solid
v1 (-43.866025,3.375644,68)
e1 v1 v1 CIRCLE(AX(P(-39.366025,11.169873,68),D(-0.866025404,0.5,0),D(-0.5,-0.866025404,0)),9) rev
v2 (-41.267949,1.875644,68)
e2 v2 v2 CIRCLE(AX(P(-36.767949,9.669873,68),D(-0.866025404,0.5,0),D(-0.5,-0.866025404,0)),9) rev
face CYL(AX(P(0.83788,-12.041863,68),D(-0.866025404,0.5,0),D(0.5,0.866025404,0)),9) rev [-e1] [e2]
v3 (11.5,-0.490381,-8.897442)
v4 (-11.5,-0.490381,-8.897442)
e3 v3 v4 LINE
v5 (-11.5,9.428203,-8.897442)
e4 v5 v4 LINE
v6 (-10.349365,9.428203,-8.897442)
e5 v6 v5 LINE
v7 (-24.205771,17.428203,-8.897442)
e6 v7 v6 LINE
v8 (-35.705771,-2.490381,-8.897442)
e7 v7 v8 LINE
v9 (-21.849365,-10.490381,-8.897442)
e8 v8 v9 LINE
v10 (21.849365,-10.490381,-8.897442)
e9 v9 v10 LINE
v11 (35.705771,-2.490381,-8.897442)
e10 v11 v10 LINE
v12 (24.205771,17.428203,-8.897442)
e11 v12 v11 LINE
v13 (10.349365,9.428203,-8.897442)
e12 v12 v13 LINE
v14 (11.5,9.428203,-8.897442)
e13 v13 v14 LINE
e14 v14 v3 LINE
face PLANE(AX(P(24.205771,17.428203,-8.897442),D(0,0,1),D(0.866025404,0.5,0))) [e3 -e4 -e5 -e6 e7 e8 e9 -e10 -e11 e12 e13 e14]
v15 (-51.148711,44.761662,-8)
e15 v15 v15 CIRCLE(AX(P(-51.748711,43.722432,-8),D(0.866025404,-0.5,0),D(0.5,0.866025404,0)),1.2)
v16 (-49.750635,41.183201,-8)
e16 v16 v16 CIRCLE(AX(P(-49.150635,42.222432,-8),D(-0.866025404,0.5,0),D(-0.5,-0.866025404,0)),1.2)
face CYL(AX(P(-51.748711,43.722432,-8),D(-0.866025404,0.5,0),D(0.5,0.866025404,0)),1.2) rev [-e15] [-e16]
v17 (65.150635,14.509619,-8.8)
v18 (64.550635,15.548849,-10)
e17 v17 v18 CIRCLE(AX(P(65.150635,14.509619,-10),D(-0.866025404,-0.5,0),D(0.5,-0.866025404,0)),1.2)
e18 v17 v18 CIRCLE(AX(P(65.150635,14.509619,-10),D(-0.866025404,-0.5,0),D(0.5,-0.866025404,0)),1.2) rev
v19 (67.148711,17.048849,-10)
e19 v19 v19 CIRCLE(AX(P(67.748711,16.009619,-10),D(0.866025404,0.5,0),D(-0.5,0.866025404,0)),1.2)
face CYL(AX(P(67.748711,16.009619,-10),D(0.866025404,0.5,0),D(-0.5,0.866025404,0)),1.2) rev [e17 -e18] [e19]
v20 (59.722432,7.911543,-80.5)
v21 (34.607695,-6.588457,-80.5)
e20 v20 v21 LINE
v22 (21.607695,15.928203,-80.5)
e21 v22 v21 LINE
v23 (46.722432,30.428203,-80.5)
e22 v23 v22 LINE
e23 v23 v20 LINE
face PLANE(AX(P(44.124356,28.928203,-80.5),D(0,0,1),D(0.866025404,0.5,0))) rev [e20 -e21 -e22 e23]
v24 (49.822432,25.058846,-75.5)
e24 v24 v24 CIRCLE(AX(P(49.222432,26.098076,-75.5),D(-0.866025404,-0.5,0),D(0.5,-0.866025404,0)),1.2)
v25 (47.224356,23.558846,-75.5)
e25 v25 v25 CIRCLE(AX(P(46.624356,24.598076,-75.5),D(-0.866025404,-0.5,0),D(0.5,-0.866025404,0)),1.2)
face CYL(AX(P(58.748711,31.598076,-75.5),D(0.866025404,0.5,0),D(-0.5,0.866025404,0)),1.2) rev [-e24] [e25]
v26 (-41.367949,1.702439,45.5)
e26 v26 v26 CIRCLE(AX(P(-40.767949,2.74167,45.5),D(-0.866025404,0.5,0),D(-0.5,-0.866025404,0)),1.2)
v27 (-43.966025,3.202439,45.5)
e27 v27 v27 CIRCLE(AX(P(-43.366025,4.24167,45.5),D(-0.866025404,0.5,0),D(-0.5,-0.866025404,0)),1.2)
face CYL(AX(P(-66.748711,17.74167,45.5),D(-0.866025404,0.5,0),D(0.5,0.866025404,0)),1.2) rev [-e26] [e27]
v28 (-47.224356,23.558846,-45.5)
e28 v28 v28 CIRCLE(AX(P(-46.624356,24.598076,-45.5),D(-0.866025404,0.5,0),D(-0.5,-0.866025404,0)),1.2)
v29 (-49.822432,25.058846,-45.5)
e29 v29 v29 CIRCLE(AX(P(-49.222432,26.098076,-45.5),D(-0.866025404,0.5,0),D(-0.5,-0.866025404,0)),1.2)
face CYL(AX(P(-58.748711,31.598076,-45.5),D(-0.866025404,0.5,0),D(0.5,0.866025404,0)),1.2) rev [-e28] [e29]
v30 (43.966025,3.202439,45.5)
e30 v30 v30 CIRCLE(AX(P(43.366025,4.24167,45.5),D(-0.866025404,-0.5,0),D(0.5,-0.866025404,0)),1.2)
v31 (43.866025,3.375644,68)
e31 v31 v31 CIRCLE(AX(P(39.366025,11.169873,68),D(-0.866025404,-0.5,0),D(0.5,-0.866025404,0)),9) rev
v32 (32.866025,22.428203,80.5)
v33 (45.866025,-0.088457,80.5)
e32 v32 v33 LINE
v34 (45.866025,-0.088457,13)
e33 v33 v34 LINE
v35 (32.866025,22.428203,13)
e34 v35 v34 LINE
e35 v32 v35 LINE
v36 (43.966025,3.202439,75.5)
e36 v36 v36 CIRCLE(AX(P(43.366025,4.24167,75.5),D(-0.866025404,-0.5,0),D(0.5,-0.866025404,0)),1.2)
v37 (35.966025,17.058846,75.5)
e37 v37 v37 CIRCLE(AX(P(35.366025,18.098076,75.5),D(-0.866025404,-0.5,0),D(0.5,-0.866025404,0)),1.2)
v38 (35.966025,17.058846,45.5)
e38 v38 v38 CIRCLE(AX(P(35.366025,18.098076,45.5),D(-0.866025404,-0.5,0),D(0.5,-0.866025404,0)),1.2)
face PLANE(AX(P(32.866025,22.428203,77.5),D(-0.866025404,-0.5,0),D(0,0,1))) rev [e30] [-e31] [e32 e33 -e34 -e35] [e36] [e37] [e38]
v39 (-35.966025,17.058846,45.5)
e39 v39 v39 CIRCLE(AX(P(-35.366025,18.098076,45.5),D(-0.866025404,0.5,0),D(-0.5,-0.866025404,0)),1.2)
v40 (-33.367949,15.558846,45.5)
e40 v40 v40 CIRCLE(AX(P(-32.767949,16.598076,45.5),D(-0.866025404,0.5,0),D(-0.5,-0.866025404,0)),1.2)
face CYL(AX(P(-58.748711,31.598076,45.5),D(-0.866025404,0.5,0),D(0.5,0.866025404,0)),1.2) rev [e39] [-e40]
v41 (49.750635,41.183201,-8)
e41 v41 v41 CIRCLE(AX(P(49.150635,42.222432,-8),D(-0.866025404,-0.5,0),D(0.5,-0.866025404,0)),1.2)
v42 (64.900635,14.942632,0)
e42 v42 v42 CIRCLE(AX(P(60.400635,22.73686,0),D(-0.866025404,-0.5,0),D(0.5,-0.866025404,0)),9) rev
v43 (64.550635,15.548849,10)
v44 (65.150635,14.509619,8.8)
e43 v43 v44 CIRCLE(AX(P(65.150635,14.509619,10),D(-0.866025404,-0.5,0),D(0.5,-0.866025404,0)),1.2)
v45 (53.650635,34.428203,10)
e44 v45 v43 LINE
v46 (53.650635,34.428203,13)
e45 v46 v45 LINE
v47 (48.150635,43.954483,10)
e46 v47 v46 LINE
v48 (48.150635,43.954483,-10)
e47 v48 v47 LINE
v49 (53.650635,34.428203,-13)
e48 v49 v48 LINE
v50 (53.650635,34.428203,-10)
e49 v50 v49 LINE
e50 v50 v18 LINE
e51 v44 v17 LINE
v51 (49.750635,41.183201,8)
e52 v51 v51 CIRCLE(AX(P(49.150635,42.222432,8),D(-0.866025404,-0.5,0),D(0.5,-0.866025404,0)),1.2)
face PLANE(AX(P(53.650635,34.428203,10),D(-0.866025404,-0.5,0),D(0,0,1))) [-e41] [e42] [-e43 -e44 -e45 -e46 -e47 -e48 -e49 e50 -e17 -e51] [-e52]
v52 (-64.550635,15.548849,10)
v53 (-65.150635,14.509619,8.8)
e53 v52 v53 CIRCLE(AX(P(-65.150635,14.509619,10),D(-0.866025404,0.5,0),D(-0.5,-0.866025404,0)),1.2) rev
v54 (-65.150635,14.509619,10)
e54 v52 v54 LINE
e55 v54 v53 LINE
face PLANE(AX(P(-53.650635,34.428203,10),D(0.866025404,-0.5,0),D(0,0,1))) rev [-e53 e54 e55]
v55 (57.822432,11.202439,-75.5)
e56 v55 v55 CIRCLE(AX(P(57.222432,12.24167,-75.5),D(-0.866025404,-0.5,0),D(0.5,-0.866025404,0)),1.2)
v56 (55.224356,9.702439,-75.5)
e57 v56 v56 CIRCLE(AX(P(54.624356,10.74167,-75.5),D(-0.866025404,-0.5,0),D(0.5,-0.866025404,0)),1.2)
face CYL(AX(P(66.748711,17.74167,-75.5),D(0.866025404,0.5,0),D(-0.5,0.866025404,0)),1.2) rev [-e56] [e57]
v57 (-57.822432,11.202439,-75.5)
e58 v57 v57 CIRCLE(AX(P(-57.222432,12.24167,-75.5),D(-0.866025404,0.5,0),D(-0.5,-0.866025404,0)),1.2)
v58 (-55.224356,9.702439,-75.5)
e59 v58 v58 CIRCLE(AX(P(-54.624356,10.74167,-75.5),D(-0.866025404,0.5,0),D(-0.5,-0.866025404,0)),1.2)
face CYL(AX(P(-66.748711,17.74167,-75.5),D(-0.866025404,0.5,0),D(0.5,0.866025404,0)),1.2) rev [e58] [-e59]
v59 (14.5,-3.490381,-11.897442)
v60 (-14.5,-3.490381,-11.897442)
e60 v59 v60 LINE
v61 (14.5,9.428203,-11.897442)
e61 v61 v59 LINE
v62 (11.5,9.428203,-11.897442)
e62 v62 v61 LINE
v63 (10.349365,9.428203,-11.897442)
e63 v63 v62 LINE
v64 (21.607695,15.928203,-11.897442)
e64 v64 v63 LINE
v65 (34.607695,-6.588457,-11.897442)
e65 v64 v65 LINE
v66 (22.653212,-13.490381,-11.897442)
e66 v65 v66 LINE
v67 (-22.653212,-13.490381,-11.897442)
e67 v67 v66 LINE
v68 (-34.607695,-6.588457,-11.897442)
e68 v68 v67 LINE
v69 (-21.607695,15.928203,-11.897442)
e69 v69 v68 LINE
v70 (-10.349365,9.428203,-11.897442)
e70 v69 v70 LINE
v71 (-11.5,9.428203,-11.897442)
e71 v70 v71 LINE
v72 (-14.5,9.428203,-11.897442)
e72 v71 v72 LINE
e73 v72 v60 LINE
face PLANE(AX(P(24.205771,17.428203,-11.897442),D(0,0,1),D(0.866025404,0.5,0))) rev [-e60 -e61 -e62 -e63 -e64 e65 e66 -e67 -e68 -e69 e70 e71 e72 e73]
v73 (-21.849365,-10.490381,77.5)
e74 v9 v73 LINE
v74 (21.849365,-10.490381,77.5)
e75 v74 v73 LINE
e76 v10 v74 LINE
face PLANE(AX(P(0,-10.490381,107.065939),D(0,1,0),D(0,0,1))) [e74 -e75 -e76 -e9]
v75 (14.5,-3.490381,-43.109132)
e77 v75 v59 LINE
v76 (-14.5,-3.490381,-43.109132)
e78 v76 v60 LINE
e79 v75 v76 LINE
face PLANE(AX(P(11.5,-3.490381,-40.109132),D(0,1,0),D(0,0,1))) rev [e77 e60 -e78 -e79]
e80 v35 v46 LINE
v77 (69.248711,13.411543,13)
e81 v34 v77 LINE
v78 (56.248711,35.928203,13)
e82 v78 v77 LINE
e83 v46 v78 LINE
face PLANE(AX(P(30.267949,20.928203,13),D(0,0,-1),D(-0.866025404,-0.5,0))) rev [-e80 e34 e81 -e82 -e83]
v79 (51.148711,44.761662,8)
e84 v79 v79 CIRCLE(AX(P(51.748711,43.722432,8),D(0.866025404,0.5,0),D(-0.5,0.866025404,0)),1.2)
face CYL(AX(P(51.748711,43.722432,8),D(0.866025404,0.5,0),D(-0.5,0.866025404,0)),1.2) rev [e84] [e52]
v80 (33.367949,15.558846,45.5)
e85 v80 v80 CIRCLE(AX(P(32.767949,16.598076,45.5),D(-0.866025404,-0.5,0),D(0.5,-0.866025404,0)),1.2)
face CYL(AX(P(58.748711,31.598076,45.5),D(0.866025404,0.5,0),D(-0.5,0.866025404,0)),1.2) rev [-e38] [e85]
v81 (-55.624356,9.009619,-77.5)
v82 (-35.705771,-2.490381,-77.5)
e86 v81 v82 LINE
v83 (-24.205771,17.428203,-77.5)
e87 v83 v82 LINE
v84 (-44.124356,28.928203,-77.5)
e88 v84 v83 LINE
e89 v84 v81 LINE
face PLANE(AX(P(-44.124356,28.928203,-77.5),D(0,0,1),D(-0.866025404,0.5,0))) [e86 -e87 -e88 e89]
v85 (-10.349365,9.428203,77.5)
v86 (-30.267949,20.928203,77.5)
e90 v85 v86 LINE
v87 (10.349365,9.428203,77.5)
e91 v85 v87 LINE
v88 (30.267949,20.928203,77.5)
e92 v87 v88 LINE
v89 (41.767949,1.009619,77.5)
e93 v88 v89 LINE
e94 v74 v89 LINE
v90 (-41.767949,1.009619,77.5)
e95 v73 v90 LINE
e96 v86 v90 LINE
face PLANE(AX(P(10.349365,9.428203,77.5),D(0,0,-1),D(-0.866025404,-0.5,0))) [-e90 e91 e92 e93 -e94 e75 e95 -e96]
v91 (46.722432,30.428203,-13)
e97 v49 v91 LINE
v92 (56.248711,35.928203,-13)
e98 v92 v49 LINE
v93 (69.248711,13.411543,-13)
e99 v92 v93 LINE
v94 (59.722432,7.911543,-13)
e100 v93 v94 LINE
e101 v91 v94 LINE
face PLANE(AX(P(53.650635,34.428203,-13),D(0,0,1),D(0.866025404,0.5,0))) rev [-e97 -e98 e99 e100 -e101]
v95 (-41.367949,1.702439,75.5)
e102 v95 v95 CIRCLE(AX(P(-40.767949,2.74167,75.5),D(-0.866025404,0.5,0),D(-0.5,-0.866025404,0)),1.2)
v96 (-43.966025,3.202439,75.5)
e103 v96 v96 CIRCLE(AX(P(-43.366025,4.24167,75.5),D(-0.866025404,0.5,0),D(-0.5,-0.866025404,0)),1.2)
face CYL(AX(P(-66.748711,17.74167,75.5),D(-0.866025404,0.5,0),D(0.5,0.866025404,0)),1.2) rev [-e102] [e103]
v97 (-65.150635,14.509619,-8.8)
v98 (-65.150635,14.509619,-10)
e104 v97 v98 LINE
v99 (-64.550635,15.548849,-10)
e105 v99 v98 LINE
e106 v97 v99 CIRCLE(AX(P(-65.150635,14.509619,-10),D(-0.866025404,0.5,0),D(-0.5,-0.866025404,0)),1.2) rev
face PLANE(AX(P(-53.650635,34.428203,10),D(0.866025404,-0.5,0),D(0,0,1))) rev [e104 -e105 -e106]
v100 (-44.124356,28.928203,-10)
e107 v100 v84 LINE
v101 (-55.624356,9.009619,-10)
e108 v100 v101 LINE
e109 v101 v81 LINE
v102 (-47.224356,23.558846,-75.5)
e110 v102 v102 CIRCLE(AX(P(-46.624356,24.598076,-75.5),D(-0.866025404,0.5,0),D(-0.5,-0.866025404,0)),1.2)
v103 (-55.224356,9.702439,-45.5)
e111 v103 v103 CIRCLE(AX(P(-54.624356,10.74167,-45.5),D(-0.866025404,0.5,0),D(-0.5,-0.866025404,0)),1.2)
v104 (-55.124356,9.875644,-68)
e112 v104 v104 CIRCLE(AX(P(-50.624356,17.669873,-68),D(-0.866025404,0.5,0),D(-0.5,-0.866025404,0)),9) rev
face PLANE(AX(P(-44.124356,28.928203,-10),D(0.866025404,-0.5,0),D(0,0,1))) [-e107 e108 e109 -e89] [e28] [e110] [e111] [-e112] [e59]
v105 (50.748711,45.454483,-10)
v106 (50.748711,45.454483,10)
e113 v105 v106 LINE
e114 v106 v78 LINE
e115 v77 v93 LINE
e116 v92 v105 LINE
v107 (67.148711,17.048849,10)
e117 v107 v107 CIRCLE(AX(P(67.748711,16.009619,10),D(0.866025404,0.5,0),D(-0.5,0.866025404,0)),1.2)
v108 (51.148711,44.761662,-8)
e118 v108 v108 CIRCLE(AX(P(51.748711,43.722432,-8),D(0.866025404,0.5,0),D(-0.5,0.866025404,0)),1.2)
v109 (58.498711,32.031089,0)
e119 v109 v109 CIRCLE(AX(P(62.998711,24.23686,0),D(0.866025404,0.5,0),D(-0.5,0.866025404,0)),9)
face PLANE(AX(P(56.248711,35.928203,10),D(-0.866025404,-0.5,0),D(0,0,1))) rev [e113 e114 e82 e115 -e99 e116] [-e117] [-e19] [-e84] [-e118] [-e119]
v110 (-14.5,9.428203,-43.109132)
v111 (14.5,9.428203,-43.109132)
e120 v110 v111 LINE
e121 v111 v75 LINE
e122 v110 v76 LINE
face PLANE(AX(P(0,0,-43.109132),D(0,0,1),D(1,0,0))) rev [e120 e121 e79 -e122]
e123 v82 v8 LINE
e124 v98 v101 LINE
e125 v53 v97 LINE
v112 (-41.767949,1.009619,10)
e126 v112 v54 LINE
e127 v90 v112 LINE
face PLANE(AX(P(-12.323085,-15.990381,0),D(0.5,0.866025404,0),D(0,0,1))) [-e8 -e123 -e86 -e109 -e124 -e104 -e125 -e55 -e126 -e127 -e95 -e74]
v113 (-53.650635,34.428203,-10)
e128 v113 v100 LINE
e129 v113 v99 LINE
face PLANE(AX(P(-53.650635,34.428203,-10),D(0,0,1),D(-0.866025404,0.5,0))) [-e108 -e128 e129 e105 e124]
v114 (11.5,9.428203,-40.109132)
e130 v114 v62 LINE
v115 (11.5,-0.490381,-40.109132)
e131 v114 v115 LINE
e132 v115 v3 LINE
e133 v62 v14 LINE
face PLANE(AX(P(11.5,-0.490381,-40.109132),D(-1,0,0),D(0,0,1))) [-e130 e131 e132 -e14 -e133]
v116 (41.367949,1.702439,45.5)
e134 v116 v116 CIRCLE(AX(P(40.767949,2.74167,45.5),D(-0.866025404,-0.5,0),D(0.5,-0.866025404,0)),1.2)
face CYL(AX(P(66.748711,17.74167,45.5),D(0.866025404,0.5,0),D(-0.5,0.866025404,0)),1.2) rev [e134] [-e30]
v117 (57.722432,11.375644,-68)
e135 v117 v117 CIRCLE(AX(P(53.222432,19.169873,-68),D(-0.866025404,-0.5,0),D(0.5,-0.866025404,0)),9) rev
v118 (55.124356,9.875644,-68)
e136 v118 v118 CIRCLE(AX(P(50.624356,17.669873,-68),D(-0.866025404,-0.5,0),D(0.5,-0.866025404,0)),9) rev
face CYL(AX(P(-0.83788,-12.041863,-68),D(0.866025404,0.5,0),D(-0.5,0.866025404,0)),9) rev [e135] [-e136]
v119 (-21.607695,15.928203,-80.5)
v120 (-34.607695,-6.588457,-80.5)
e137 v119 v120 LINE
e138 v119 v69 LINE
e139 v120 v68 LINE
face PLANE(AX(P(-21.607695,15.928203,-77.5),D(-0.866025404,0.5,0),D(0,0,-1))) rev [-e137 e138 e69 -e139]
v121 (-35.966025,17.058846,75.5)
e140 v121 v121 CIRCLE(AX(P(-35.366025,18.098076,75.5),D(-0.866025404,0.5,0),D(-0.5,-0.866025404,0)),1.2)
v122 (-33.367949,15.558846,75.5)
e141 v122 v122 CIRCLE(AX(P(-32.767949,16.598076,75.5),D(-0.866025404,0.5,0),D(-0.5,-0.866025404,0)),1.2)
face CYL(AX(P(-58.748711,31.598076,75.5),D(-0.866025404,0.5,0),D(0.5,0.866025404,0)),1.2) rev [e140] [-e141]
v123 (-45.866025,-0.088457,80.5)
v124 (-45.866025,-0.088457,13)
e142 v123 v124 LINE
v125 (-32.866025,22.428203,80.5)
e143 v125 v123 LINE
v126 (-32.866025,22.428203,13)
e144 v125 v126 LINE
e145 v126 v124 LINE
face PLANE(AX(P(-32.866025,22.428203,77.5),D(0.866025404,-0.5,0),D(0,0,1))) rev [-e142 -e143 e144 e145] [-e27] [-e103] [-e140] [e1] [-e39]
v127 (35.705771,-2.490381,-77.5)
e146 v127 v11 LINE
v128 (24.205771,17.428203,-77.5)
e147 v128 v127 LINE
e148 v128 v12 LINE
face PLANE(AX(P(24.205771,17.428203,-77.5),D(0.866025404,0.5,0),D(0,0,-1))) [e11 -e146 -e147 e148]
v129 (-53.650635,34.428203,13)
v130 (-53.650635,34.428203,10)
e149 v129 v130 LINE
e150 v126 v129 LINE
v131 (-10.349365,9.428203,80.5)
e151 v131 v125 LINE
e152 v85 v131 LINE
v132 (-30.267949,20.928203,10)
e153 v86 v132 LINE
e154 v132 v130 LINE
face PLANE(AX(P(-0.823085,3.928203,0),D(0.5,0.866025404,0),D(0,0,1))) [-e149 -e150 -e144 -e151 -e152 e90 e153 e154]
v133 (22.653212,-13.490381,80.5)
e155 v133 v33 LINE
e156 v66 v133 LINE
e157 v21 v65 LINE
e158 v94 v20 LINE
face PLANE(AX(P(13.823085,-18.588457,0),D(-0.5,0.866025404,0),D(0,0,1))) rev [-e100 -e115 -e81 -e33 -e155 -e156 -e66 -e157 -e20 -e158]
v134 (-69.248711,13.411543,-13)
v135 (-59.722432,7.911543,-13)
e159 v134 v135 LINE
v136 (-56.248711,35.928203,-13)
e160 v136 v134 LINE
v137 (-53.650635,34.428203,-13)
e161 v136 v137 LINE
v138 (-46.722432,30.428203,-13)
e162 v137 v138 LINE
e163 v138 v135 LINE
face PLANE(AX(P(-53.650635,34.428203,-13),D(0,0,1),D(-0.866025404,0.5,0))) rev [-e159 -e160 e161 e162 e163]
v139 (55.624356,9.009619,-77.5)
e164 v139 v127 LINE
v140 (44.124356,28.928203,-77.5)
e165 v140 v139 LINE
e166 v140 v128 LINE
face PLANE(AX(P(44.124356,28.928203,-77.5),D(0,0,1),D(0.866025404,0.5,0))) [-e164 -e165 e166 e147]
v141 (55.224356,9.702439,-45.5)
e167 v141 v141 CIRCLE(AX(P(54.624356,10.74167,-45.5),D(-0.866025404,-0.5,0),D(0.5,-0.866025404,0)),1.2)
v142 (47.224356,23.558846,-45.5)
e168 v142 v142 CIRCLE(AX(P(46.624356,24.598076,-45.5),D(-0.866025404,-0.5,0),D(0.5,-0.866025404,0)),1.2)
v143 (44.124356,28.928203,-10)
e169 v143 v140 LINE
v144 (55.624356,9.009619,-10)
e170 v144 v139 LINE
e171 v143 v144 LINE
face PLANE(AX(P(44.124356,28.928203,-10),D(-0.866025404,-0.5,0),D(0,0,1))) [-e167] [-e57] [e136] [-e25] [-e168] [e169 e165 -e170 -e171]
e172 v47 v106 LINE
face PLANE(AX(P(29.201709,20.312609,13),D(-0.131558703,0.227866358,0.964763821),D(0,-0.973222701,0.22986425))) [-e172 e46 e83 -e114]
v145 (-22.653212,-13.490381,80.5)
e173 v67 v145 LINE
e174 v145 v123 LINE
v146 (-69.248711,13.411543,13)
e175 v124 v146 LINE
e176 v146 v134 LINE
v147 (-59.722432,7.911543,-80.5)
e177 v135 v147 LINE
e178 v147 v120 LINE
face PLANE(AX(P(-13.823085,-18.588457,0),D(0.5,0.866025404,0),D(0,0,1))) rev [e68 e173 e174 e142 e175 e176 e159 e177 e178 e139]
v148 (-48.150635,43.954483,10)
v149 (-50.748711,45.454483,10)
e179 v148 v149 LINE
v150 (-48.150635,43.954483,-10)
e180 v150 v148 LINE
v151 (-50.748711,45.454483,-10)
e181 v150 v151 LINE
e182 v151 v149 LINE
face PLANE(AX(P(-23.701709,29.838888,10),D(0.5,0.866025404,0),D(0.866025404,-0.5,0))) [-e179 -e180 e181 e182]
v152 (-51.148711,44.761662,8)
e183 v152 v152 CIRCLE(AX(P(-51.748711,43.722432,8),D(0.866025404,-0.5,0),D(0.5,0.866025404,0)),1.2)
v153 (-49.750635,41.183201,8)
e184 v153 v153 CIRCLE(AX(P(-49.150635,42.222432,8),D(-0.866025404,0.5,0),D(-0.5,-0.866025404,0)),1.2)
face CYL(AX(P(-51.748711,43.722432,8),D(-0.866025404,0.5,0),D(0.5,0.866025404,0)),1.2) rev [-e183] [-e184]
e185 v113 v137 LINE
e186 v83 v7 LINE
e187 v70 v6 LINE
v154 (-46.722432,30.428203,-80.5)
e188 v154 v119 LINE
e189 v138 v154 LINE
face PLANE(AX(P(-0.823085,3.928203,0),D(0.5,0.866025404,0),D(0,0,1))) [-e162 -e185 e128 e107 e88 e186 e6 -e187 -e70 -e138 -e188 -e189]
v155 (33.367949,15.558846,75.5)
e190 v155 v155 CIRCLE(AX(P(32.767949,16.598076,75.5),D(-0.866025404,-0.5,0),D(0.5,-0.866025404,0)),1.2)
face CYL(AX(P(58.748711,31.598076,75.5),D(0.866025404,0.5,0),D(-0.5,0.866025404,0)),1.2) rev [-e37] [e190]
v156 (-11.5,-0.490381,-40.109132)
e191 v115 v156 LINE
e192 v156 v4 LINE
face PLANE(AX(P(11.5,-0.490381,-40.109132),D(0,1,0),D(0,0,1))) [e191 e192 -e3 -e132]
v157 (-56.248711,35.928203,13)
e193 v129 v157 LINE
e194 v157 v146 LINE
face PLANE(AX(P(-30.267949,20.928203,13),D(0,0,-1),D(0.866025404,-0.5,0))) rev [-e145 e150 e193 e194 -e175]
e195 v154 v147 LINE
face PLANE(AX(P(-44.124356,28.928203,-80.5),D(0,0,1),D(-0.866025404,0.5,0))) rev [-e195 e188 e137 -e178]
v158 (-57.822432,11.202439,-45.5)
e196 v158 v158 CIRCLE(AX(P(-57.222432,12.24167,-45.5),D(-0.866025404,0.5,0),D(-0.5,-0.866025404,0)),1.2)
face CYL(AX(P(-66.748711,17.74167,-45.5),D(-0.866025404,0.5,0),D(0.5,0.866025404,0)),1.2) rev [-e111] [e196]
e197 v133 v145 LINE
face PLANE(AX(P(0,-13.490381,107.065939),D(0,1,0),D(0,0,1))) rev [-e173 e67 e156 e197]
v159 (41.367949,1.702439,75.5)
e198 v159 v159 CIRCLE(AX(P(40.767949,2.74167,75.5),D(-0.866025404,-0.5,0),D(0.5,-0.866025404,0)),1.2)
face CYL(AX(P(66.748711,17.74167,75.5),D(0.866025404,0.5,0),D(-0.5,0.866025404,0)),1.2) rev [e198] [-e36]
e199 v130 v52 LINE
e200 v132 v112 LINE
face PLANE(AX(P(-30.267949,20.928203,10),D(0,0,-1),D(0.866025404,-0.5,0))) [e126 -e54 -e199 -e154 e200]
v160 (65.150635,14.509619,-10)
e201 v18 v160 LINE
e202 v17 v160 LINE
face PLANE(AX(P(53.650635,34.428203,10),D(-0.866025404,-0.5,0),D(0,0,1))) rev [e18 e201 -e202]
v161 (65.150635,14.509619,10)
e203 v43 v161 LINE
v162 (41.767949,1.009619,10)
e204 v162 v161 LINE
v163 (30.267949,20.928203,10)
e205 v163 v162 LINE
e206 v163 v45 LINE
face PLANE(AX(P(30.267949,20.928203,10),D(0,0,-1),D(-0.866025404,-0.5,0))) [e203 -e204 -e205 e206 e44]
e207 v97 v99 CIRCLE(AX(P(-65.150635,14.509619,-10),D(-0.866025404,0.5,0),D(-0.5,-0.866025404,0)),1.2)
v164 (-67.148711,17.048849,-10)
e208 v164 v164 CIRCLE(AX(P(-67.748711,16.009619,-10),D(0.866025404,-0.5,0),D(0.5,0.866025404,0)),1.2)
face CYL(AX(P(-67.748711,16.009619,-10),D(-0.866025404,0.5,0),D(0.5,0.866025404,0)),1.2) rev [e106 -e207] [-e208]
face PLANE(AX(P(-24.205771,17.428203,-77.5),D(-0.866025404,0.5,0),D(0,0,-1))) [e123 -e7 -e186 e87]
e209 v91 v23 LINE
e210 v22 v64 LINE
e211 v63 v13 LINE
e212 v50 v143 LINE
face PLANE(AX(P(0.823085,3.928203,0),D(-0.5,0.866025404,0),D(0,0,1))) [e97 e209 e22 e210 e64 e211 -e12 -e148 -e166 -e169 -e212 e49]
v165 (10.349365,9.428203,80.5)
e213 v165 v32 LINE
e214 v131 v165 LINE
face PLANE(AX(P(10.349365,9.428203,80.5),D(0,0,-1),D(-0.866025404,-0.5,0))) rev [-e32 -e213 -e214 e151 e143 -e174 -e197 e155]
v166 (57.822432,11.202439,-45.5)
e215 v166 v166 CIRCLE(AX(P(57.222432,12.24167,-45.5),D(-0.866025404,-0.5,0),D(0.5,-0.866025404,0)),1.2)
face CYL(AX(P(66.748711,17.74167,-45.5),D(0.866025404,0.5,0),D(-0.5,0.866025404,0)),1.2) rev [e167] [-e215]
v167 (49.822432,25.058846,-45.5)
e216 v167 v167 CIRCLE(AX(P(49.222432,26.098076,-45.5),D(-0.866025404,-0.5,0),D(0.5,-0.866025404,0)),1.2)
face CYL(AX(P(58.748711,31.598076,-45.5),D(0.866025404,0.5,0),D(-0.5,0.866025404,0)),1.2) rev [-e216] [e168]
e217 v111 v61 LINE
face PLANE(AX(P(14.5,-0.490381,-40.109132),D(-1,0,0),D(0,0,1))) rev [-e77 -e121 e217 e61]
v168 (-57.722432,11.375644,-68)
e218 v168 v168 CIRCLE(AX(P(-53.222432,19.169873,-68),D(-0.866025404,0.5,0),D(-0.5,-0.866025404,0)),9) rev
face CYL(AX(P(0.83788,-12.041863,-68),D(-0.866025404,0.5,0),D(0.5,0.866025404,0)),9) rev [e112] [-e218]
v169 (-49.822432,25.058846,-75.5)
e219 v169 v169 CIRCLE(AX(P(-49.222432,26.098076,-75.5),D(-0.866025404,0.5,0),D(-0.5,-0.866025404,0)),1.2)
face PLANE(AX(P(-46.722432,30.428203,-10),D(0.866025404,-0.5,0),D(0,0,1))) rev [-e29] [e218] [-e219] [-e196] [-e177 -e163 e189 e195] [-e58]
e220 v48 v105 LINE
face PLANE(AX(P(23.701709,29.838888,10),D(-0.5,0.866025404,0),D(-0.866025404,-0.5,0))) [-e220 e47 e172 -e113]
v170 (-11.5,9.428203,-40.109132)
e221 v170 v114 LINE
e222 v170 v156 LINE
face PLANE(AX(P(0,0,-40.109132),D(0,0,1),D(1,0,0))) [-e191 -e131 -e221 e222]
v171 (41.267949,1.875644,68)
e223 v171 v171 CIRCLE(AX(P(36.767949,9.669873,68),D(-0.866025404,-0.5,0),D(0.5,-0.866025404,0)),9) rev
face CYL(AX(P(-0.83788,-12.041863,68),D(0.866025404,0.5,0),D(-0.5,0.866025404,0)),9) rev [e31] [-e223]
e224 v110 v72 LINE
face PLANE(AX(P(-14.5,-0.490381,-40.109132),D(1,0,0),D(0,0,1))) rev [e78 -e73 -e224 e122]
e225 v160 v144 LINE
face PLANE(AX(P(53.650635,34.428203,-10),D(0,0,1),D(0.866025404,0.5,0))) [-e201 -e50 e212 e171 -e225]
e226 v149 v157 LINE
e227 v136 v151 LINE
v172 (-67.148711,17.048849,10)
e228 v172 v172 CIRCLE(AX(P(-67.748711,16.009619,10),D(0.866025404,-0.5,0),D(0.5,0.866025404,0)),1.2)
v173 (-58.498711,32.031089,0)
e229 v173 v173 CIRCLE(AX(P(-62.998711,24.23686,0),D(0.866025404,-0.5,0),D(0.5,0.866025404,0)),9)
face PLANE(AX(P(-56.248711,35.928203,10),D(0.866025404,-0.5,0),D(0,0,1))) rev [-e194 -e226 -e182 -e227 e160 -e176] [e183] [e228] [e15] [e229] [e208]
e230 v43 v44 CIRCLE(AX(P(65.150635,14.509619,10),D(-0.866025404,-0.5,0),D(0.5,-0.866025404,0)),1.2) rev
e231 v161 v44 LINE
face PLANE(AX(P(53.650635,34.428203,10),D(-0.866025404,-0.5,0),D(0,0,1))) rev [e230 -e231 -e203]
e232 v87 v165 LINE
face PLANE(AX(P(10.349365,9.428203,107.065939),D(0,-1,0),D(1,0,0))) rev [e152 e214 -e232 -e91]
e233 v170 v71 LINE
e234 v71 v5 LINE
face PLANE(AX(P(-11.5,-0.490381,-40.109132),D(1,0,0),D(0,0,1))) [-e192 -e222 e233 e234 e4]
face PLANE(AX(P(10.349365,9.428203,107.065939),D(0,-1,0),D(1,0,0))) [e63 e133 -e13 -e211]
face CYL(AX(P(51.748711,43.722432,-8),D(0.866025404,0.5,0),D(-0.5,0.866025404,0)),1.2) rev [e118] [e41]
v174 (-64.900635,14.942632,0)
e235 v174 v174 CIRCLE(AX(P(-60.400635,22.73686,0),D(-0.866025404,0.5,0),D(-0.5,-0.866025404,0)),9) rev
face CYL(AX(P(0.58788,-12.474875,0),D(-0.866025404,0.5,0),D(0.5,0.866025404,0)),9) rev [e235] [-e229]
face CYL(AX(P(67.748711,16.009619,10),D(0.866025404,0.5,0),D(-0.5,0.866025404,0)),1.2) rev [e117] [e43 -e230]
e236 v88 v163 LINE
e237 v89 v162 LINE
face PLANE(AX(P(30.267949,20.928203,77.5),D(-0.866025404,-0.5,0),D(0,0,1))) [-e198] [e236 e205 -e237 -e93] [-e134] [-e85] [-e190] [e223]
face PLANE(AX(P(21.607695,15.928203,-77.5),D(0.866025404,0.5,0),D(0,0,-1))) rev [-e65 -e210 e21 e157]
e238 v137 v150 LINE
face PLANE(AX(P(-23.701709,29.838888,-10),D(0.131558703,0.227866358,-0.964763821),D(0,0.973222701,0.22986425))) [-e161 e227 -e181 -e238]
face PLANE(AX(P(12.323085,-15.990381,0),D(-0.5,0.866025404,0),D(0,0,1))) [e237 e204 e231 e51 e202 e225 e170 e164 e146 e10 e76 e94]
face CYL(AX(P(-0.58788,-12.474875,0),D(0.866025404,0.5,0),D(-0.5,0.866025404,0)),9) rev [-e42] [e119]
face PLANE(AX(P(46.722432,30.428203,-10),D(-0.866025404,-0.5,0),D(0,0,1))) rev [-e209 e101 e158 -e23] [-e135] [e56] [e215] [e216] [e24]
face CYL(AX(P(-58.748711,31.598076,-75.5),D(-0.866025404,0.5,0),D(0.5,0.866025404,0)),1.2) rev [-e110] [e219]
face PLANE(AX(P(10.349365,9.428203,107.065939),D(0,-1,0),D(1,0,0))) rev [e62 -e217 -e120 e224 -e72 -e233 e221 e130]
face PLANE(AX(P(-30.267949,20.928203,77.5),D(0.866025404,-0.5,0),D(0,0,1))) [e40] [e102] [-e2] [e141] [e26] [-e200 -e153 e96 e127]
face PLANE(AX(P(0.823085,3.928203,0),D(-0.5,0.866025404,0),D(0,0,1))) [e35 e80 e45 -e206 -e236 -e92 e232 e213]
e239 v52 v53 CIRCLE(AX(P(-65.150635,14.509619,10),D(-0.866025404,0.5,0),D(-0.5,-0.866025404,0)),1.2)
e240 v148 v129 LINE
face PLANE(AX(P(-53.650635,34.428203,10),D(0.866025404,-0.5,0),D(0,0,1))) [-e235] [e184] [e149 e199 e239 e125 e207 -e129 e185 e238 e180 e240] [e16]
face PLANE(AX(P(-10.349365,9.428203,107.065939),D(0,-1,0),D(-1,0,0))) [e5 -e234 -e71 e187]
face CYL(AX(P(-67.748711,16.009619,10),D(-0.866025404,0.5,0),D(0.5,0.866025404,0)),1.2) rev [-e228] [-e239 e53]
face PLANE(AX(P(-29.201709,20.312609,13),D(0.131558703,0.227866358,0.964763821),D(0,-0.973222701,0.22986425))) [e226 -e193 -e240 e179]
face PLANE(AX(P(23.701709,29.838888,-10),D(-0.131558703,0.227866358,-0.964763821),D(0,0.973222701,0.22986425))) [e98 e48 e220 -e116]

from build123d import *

# Parameters (mm, degrees)
BOSS_EXTRUDE1_DEPTH            = 23
BODY_MOVE_COPY1_ANGLE          = 30
BOSS_EXTRUDE2_DEPTH            = 77.5
BOSS_EXTRUDE2_DEPTH_BACK       = 8.89744
SKETCH13_W                     = 11.5
SKETCH13_H                     = 9.918584287
BOSS_EXTRUDE4_DEPTH            = 31.21169
SHELL1_START                   = 11.5
SHELL1_DEPTH                   = 3
SHELL1_2_DEPTH                 = 22.653212483
SHELL1_3_DEPTH                 = 11.5
SHELL1_4_DEPTH                 = 22.653212483
SHELL1_5_DEPTH                 = 11.5
SHELL1_6_DEPTH                 = 11.153212483
SHELL1_START_2                 = -77.5
SHELL1_7_DEPTH                 = 87.5
SHELL1_START_3                 = -8.897442479
SHELL1_8_DEPTH                 = 86.397442477
SHELL1_START_4                 = -10
SHELL1_9_DEPTH                 = 20
SHELL1_START_5                 = -80.5
SHELL1_10_DEPTH                = 70.5
SHELL1_START_6                 = 10
SHELL1_11_DEPTH                = 70.499999998
SHELL1_START_7                 = -11.897442479
SHELL1_12_DEPTH                = 24.897442479
SHELL1_13_DEPTH                = 3
SHELL1_14_DEPTH                = 3
SHELL1_START_8                 = 77.499999998
SHELL1_15_DEPTH                = 3
SHELL1_16_DEPTH                = 1.897442479
SHELL1_START_9                 = -13
SHELL1_17_DEPTH                = 1.102557521
SHELL1_START_10                = -10.287226583
SHELL1_18_DEPTH                = 1.389784104
CUT_EXTRUDE2_REACH             = 111.579
SKETCH6_R                      = 9
BOSS_EXTRUDE3_DEPTH            = 3
M2_START                       = 36
M2_CLEARANCE_HOLE1_OUTLINE_R   = 1.2
M2_CLEARANCE_HOLE1_DEPTH       = 30.676914536
M2_START_2                     = 63.676914536
M2_CLEARANCE_HOLE1_2_OUTLINE_R = 1.2
M2_CLEARANCE_HOLE1_2_DEPTH     = 3


with BuildPart() as part:
    # Sketch2 → Boss-Extrude1 (new body)
    with BuildSketch(Plane(origin=(0, 0, 0), x_dir=(1, 0, 0), z_dir=(0, 1, 0))):
        Polygon((11, -77.499999998), (34, -77.499999998), (34, -10), (61, -10), (61, 10), (50, 10), (50, 77.5), (27, 77.5), (27, 8.897442479), (11, 8.897442479), align=None)
    extrude(amount=BOSS_EXTRUDE1_DEPTH)


with BuildPart() as part_1:
    # Body-Move/Copy1: moved
    add(part.part.rotate(Axis((36, 15, 0), (0, 0, 1)), BODY_MOVE_COPY1_ANGLE))

    # Sketch7 → Boss-Extrude2 (add, two sides: drawn at the far end of the back side and taken through both)
    with BuildSketch(Plane.XY.offset(-BOSS_EXTRUDE2_DEPTH_BACK)):
        Polygon((10.349364905, 9.42820323), (0, 9.42820323), (0, -10.490381057), (21.849364905, -10.490381057), align=None)
    extrude(amount=BOSS_EXTRUDE2_DEPTH + BOSS_EXTRUDE2_DEPTH_BACK)


with BuildPart() as boss_extrude4_tool:
    # Sketch13 → Boss-Extrude4 (new body)
    with BuildSketch(Plane(origin=(0, 0, -8.897442479), x_dir=(-1, 0, 0), z_dir=(0, 0, -1))):
        with Locations((-5.75, 4.468911087)):
            Rectangle(SKETCH13_W, SKETCH13_H)
    extrude(amount=BOSS_EXTRUDE4_DEPTH)


with BuildPart() as part_2:
    add(part_1.part)


with BuildPart() as part_3:
    # Boss-Extrude4: joined with boss_extrude4_tool
    add(part_2.part.fuse(boss_extrude4_tool.part, tol=0.00001))

    # Shell1: read off the stored shape, not the designer's step
    # Shell1 outline → Shell1 (add)
    with BuildSketch(Plane.YZ.offset(SHELL1_START)):
        Polygon((9.42820323, -13), (9.42820323, -11.897442479), (-3.490381057, -11.897442479), (-3.490381057, -43.109132218), (9.42820323, -43.109132218), align=None)
    extrude(amount=SHELL1_DEPTH)

    # Shell1 2 outline → Shell1 2 (cut)
    with BuildSketch(Plane.YZ):
        Polygon((9.42820323, 13), (9.42820323, 77.499999998), (-10.490381057, 77.499999998), (-10.490381057, -8.897442479), (9.42820323, -8.897442479), (9.42820323, 10), align=None)
    extrude(amount=SHELL1_2_DEPTH, mode=Mode.SUBTRACT)

    # Shell1 3 outline → Shell1 3 (cut)
    with BuildSketch(Plane.YZ):
        Polygon((9.42820323, -10), (9.42820323, -8.897442479), (-0.490381057, -8.897442479), (-0.490381057, -40.109132218), (9.42820323, -40.109132218), (9.42820323, -13), align=None)
    extrude(amount=SHELL1_3_DEPTH, mode=Mode.SUBTRACT)

    # Shell1 4 outline → Shell1 4 (add)
    with BuildSketch(Plane.YZ):
        Polygon((9.42820323, 77.499999998), (9.42820323, 80.499999998), (-13.490381057, 80.499999998), (-13.490381057, -11.897442479), (-0.490381057, -11.897442479), (-0.490381057, -8.897442479), (-10.490381057, -8.897442479), (-10.490381057, 77.499999998), align=None)
    extrude(amount=SHELL1_4_DEPTH)

    # Shell1 5 outline → Shell1 5 (add)
    with BuildSketch(Plane.YZ):
        Polygon((-0.490381057, -11.897442479), (-3.490381057, -11.897442479), (-3.490381057, -43.109132218), (9.42820323, -43.109132218), (9.42820323, -40.109132218), (-0.490381057, -40.109132218), align=None)
    extrude(amount=SHELL1_5_DEPTH)

    # Shell1 6 outline → Shell1 6 (add)
    with BuildSketch(Plane.YZ.offset(SHELL1_START)):
        Polygon((9.42820323, -10), (9.42820323, -8.897442479), (-0.490381057, -8.897442479), (-0.490381057, -11.897442479), (9.42820323, -11.897442479), align=None)
    extrude(amount=SHELL1_6_DEPTH)

    # Shell1 7 outline → Shell1 7 (cut)
    with BuildSketch(Plane.XY.offset(SHELL1_START_2)):
        Polygon((44.124355653, 28.92820323), (24.205771366, 17.42820323), (35.705771366, -2.490381057), (55.624355653, 9.009618943), align=None)
    extrude(amount=SHELL1_7_DEPTH, mode=Mode.SUBTRACT)

    # Shell1 8 outline → Shell1 8 (cut)
    with BuildSketch(Plane.XY.offset(SHELL1_START_3)):
        Polygon((41.767949192, 1.009618943), (30.267949192, 20.92820323), (10.349364905, 9.42820323), (22.653212483, 9.42820323), (22.653212483, -10.026279441), align=None)
    extrude(amount=SHELL1_8_DEPTH, mode=Mode.SUBTRACT)

    # Shell1 9 outline → Shell1 9 (cut)
    with BuildSketch(Plane.XY.offset(SHELL1_START_4)):
        Polygon((44.124355653, 28.92820323), (55.624355653, 9.009618943), (65.150635095, 14.509618943), (53.650635095, 34.42820323), align=None)
    extrude(amount=SHELL1_9_DEPTH, mode=Mode.SUBTRACT)

    # Shell1 11 outline → Shell1 11 (add)
    with BuildSketch(Plane.XY.offset(SHELL1_START_6)):
        Polygon((32.866025404, 22.42820323), (30.267949192, 20.92820323), (41.767949192, 1.009618943), (21.849364905, -10.490381057), (22.653212483, -10.490381057), (22.653212483, -13.490381057), (45.866025404, -0.088457268), align=None)
    extrude(amount=SHELL1_11_DEPTH)



with BuildPart() as body_2:
    # Shell1 10 outline → Shell1 10 (new body)
    with BuildSketch(Plane.XY.offset(SHELL1_START_5)):
        Polygon((55.624355653, 9.009618943), (35.705771366, -2.490381057), (24.205771366, 17.42820323), (21.607695155, 15.92820323), (34.607695155, -6.588457268), (59.722431864, 7.911542732), (46.722431864, 30.42820323), (44.124355653, 28.92820323), align=None)
    extrude(amount=SHELL1_10_DEPTH)


with BuildPart() as part_4:
    add(part_3.part)

    add(body_2.part)  # Shell1 12 merges body 2
    # Shell1 12 outline → Shell1 12 (add)
    with BuildSketch(Plane.XY.offset(SHELL1_START_7)):
        Polygon((21.849364905, -10.490381057), (22.653212483, -10.490381057), (22.653212483, -13.490381057), (69.248711306, 13.411542732), (56.248711306, 35.92820323), (53.650635095, 34.42820323), (65.150635095, 14.509618943), align=None)
    extrude(amount=SHELL1_12_DEPTH)

    # Shell1 13 outline → Shell1 13 (add)
    with BuildSketch(Plane.XY.offset(SHELL1_START_6)):
        Polygon((32.866025404, 22.42820323), (44.366025404, 2.509618943), (65.150635095, 14.509618943), (53.650635095, 34.42820323), align=None)
    extrude(amount=SHELL1_13_DEPTH)

    # Shell1 14 outline → Shell1 14 (add)
    with BuildSketch(Plane.XY.offset(SHELL1_START_5)):
        Polygon((44.124355653, 28.92820323), (24.205771366, 17.42820323), (35.705771366, -2.490381057), (55.624355653, 9.009618943), align=None)
    extrude(amount=SHELL1_14_DEPTH)

    # Shell1 15 outline → Shell1 15 (add)
    with BuildSketch(Plane.XY.offset(SHELL1_START_8)):
        Polygon((41.767949192, 1.009618943), (30.267949192, 20.92820323), (10.349364905, 9.42820323), (22.653212483, 9.42820323), (22.653212483, -10.026279441), align=None)
    extrude(amount=SHELL1_15_DEPTH)

    # Shell1 16 outline → Shell1 16 (add)
    with BuildSketch(Plane.XY.offset(SHELL1_START_7)):
        Polygon((53.650635095, 34.42820323), (46.722431864, 30.42820323), (58.222431864, 10.509618943), (65.150635095, 14.509618943), align=None)
        Polygon((33.107695155, -3.990381057), (21.607695155, 15.92820323), (10.349364905, 9.42820323), (22.653212483, 9.42820323), (22.653212483, -10.026279441), align=None)
    extrude(amount=SHELL1_16_DEPTH)

    # Shell1 17 outline → Shell1 17 (add)
    with BuildSketch(Plane.XY.offset(SHELL1_START_9)):
        Polygon((46.722431864, 30.42820323), (59.722431864, 7.911542732), (69.248711306, 13.411542732), (56.248711306, 35.92820323), align=None)
    extrude(amount=SHELL1_17_DEPTH)

    # Shell1 18 outline → Shell1 18 (add)
    with BuildSketch(Plane.XY.offset(SHELL1_START_10)):
        Polygon((35.705771366, -2.490381057), (24.205771366, 17.42820323), (10.349364905, 9.42820323), (22.653212483, 9.42820323), (22.653212483, -10.026279441), align=None)
    extrude(amount=SHELL1_18_DEPTH)

    # Sketch6 → Cut-Extrude2 (cut, up to next)
    with BuildSketch(Plane(origin=(57.743901834, 33.338457268, 0), x_dir=(0, 0, -1), z_dir=(0.8660254037842566, 0.5000000000003155, 0)), mode=Mode.PRIVATE) as cut_extrude2_sk1:
        with Locations(Location((-67.999999998, -10.009618943, 0), (0, 0, 270))):
            Circle(SKETCH6_R)
    cut_extrude2_tool1 = extrude(cut_extrude2_sk1.sketch, amount=-CUT_EXTRUDE2_REACH, mode=Mode.PRIVATE) & part_4.part
    # Sketch6 → Cut-Extrude2 (cut, up to next)
    with BuildSketch(Plane(origin=(57.743901834, 33.338457268, 0), x_dir=(0, 0, -1), z_dir=(0.8660254037842566, 0.5000000000003155, 0)), mode=Mode.PRIVATE) as cut_extrude2_sk2:
        with Locations(Location((0, -10.509618943, 0), (0, 0, 90))):
            Circle(SKETCH6_R)
    cut_extrude2_tool2 = extrude(cut_extrude2_sk2.sketch, amount=-CUT_EXTRUDE2_REACH, mode=Mode.PRIVATE) & part_4.part
    # Sketch6 → Cut-Extrude2 (cut, up to next)
    with BuildSketch(Plane(origin=(57.743901834, 33.338457268, 0), x_dir=(0, 0, -1), z_dir=(0.8660254037842566, 0.5000000000003155, 0)), mode=Mode.PRIVATE) as cut_extrude2_sk3:
        with Locations(Location((68, -10.009618943, 0), (0, 0, 270))):
            Circle(SKETCH6_R)
    cut_extrude2_tool3 = extrude(cut_extrude2_sk3.sketch, amount=-CUT_EXTRUDE2_REACH, mode=Mode.PRIVATE) & part_4.part
    add(cut_extrude2_tool1.solids().sort_by_distance((62.748711, 24.669873, 68))[0], mode=Mode.SUBTRACT)
    add(cut_extrude2_tool2.solids().sort_by_distance((62.998711, 24.23686, 0))[0], mode=Mode.SUBTRACT)
    add(cut_extrude2_tool3.solids().sort_by_distance((62.748711, 24.669873, -68))[0], mode=Mode.SUBTRACT)

    # Sketch11 → Boss-Extrude3 (add)
    with BuildSketch(Plane(origin=(57.743901834, 33.338457268, 0), x_dir=(0, 0, -1), z_dir=(0.8660254037842566, 0.5000000000003155, 0))):
        Polygon((-13, 2.990381057), (-10, 13.990381057), (10, 13.990381057), (13, 2.990381057), align=None)
    extrude(amount=-BOSS_EXTRUDE3_DEPTH)

    # M2 Clearance Hole1: read off the stored shape, not the designer's step
    # M2 Clearance Hole1 outline → M2 Clearance Hole1 (cut)
    with BuildSketch(Plane(origin=(0, 0, 0), x_dir=(0.5000000000003147, -0.8660254037842569, 0), z_dir=(0.8660254037842569, 0.500000000000315, 0)).offset(M2_START)):
        with Locations((-11.990381057, 8)):
            Circle(M2_CLEARANCE_HOLE1_OUTLINE_R)
        with Locations((-11.990381057, -8)):
            Circle(M2_CLEARANCE_HOLE1_OUTLINE_R)
        with Locations((18.009618943, -75.499999998)):
            Circle(M2_CLEARANCE_HOLE1_OUTLINE_R)
        with Locations((2.009618943, -75.499999998)):
            Circle(M2_CLEARANCE_HOLE1_OUTLINE_R)
        with Locations((18.009618943, -45.499999998)):
            Circle(M2_CLEARANCE_HOLE1_OUTLINE_R)
        with Locations((2.009618943, -45.499999998)):
            Circle(M2_CLEARANCE_HOLE1_OUTLINE_R)
        with Locations((18.009618943, 75.5)):
            Circle(M2_CLEARANCE_HOLE1_OUTLINE_R)
        with Locations((2.009618943, 75.5)):
            Circle(M2_CLEARANCE_HOLE1_OUTLINE_R)
        with Locations((2.009618943, 45.5)):
            Circle(M2_CLEARANCE_HOLE1_OUTLINE_R)
        with Locations((18.009618943, 45.5)):
            Circle(M2_CLEARANCE_HOLE1_OUTLINE_R)
    extrude(amount=M2_CLEARANCE_HOLE1_DEPTH, mode=Mode.SUBTRACT)

    # M2 Clearance Hole1 2 outline → M2 Clearance Hole1 2 (cut)
    with BuildSketch(Plane(origin=(0, 0, 0), x_dir=(0.5000000000003147, -0.8660254037842569, 0), z_dir=(0.8660254037842569, 0.500000000000315, 0)).offset(M2_START_2)):
        with Locations((20.009618943, 10)):
            Circle(M2_CLEARANCE_HOLE1_2_OUTLINE_R)
        with Locations((20.009618943, -10)):
            Circle(M2_CLEARANCE_HOLE1_2_OUTLINE_R)
    extrude(amount=M2_CLEARANCE_HOLE1_2_DEPTH, mode=Mode.SUBTRACT)

    # Mirror1: part across plane


with BuildPart() as part_5:
    add(part_4.part)
    add(part_4.part.mirror(Plane(origin=(0, 0, 0), x_dir=(0, 0, 1), z_dir=(1, 0, 0))))


solid = part_5.part
